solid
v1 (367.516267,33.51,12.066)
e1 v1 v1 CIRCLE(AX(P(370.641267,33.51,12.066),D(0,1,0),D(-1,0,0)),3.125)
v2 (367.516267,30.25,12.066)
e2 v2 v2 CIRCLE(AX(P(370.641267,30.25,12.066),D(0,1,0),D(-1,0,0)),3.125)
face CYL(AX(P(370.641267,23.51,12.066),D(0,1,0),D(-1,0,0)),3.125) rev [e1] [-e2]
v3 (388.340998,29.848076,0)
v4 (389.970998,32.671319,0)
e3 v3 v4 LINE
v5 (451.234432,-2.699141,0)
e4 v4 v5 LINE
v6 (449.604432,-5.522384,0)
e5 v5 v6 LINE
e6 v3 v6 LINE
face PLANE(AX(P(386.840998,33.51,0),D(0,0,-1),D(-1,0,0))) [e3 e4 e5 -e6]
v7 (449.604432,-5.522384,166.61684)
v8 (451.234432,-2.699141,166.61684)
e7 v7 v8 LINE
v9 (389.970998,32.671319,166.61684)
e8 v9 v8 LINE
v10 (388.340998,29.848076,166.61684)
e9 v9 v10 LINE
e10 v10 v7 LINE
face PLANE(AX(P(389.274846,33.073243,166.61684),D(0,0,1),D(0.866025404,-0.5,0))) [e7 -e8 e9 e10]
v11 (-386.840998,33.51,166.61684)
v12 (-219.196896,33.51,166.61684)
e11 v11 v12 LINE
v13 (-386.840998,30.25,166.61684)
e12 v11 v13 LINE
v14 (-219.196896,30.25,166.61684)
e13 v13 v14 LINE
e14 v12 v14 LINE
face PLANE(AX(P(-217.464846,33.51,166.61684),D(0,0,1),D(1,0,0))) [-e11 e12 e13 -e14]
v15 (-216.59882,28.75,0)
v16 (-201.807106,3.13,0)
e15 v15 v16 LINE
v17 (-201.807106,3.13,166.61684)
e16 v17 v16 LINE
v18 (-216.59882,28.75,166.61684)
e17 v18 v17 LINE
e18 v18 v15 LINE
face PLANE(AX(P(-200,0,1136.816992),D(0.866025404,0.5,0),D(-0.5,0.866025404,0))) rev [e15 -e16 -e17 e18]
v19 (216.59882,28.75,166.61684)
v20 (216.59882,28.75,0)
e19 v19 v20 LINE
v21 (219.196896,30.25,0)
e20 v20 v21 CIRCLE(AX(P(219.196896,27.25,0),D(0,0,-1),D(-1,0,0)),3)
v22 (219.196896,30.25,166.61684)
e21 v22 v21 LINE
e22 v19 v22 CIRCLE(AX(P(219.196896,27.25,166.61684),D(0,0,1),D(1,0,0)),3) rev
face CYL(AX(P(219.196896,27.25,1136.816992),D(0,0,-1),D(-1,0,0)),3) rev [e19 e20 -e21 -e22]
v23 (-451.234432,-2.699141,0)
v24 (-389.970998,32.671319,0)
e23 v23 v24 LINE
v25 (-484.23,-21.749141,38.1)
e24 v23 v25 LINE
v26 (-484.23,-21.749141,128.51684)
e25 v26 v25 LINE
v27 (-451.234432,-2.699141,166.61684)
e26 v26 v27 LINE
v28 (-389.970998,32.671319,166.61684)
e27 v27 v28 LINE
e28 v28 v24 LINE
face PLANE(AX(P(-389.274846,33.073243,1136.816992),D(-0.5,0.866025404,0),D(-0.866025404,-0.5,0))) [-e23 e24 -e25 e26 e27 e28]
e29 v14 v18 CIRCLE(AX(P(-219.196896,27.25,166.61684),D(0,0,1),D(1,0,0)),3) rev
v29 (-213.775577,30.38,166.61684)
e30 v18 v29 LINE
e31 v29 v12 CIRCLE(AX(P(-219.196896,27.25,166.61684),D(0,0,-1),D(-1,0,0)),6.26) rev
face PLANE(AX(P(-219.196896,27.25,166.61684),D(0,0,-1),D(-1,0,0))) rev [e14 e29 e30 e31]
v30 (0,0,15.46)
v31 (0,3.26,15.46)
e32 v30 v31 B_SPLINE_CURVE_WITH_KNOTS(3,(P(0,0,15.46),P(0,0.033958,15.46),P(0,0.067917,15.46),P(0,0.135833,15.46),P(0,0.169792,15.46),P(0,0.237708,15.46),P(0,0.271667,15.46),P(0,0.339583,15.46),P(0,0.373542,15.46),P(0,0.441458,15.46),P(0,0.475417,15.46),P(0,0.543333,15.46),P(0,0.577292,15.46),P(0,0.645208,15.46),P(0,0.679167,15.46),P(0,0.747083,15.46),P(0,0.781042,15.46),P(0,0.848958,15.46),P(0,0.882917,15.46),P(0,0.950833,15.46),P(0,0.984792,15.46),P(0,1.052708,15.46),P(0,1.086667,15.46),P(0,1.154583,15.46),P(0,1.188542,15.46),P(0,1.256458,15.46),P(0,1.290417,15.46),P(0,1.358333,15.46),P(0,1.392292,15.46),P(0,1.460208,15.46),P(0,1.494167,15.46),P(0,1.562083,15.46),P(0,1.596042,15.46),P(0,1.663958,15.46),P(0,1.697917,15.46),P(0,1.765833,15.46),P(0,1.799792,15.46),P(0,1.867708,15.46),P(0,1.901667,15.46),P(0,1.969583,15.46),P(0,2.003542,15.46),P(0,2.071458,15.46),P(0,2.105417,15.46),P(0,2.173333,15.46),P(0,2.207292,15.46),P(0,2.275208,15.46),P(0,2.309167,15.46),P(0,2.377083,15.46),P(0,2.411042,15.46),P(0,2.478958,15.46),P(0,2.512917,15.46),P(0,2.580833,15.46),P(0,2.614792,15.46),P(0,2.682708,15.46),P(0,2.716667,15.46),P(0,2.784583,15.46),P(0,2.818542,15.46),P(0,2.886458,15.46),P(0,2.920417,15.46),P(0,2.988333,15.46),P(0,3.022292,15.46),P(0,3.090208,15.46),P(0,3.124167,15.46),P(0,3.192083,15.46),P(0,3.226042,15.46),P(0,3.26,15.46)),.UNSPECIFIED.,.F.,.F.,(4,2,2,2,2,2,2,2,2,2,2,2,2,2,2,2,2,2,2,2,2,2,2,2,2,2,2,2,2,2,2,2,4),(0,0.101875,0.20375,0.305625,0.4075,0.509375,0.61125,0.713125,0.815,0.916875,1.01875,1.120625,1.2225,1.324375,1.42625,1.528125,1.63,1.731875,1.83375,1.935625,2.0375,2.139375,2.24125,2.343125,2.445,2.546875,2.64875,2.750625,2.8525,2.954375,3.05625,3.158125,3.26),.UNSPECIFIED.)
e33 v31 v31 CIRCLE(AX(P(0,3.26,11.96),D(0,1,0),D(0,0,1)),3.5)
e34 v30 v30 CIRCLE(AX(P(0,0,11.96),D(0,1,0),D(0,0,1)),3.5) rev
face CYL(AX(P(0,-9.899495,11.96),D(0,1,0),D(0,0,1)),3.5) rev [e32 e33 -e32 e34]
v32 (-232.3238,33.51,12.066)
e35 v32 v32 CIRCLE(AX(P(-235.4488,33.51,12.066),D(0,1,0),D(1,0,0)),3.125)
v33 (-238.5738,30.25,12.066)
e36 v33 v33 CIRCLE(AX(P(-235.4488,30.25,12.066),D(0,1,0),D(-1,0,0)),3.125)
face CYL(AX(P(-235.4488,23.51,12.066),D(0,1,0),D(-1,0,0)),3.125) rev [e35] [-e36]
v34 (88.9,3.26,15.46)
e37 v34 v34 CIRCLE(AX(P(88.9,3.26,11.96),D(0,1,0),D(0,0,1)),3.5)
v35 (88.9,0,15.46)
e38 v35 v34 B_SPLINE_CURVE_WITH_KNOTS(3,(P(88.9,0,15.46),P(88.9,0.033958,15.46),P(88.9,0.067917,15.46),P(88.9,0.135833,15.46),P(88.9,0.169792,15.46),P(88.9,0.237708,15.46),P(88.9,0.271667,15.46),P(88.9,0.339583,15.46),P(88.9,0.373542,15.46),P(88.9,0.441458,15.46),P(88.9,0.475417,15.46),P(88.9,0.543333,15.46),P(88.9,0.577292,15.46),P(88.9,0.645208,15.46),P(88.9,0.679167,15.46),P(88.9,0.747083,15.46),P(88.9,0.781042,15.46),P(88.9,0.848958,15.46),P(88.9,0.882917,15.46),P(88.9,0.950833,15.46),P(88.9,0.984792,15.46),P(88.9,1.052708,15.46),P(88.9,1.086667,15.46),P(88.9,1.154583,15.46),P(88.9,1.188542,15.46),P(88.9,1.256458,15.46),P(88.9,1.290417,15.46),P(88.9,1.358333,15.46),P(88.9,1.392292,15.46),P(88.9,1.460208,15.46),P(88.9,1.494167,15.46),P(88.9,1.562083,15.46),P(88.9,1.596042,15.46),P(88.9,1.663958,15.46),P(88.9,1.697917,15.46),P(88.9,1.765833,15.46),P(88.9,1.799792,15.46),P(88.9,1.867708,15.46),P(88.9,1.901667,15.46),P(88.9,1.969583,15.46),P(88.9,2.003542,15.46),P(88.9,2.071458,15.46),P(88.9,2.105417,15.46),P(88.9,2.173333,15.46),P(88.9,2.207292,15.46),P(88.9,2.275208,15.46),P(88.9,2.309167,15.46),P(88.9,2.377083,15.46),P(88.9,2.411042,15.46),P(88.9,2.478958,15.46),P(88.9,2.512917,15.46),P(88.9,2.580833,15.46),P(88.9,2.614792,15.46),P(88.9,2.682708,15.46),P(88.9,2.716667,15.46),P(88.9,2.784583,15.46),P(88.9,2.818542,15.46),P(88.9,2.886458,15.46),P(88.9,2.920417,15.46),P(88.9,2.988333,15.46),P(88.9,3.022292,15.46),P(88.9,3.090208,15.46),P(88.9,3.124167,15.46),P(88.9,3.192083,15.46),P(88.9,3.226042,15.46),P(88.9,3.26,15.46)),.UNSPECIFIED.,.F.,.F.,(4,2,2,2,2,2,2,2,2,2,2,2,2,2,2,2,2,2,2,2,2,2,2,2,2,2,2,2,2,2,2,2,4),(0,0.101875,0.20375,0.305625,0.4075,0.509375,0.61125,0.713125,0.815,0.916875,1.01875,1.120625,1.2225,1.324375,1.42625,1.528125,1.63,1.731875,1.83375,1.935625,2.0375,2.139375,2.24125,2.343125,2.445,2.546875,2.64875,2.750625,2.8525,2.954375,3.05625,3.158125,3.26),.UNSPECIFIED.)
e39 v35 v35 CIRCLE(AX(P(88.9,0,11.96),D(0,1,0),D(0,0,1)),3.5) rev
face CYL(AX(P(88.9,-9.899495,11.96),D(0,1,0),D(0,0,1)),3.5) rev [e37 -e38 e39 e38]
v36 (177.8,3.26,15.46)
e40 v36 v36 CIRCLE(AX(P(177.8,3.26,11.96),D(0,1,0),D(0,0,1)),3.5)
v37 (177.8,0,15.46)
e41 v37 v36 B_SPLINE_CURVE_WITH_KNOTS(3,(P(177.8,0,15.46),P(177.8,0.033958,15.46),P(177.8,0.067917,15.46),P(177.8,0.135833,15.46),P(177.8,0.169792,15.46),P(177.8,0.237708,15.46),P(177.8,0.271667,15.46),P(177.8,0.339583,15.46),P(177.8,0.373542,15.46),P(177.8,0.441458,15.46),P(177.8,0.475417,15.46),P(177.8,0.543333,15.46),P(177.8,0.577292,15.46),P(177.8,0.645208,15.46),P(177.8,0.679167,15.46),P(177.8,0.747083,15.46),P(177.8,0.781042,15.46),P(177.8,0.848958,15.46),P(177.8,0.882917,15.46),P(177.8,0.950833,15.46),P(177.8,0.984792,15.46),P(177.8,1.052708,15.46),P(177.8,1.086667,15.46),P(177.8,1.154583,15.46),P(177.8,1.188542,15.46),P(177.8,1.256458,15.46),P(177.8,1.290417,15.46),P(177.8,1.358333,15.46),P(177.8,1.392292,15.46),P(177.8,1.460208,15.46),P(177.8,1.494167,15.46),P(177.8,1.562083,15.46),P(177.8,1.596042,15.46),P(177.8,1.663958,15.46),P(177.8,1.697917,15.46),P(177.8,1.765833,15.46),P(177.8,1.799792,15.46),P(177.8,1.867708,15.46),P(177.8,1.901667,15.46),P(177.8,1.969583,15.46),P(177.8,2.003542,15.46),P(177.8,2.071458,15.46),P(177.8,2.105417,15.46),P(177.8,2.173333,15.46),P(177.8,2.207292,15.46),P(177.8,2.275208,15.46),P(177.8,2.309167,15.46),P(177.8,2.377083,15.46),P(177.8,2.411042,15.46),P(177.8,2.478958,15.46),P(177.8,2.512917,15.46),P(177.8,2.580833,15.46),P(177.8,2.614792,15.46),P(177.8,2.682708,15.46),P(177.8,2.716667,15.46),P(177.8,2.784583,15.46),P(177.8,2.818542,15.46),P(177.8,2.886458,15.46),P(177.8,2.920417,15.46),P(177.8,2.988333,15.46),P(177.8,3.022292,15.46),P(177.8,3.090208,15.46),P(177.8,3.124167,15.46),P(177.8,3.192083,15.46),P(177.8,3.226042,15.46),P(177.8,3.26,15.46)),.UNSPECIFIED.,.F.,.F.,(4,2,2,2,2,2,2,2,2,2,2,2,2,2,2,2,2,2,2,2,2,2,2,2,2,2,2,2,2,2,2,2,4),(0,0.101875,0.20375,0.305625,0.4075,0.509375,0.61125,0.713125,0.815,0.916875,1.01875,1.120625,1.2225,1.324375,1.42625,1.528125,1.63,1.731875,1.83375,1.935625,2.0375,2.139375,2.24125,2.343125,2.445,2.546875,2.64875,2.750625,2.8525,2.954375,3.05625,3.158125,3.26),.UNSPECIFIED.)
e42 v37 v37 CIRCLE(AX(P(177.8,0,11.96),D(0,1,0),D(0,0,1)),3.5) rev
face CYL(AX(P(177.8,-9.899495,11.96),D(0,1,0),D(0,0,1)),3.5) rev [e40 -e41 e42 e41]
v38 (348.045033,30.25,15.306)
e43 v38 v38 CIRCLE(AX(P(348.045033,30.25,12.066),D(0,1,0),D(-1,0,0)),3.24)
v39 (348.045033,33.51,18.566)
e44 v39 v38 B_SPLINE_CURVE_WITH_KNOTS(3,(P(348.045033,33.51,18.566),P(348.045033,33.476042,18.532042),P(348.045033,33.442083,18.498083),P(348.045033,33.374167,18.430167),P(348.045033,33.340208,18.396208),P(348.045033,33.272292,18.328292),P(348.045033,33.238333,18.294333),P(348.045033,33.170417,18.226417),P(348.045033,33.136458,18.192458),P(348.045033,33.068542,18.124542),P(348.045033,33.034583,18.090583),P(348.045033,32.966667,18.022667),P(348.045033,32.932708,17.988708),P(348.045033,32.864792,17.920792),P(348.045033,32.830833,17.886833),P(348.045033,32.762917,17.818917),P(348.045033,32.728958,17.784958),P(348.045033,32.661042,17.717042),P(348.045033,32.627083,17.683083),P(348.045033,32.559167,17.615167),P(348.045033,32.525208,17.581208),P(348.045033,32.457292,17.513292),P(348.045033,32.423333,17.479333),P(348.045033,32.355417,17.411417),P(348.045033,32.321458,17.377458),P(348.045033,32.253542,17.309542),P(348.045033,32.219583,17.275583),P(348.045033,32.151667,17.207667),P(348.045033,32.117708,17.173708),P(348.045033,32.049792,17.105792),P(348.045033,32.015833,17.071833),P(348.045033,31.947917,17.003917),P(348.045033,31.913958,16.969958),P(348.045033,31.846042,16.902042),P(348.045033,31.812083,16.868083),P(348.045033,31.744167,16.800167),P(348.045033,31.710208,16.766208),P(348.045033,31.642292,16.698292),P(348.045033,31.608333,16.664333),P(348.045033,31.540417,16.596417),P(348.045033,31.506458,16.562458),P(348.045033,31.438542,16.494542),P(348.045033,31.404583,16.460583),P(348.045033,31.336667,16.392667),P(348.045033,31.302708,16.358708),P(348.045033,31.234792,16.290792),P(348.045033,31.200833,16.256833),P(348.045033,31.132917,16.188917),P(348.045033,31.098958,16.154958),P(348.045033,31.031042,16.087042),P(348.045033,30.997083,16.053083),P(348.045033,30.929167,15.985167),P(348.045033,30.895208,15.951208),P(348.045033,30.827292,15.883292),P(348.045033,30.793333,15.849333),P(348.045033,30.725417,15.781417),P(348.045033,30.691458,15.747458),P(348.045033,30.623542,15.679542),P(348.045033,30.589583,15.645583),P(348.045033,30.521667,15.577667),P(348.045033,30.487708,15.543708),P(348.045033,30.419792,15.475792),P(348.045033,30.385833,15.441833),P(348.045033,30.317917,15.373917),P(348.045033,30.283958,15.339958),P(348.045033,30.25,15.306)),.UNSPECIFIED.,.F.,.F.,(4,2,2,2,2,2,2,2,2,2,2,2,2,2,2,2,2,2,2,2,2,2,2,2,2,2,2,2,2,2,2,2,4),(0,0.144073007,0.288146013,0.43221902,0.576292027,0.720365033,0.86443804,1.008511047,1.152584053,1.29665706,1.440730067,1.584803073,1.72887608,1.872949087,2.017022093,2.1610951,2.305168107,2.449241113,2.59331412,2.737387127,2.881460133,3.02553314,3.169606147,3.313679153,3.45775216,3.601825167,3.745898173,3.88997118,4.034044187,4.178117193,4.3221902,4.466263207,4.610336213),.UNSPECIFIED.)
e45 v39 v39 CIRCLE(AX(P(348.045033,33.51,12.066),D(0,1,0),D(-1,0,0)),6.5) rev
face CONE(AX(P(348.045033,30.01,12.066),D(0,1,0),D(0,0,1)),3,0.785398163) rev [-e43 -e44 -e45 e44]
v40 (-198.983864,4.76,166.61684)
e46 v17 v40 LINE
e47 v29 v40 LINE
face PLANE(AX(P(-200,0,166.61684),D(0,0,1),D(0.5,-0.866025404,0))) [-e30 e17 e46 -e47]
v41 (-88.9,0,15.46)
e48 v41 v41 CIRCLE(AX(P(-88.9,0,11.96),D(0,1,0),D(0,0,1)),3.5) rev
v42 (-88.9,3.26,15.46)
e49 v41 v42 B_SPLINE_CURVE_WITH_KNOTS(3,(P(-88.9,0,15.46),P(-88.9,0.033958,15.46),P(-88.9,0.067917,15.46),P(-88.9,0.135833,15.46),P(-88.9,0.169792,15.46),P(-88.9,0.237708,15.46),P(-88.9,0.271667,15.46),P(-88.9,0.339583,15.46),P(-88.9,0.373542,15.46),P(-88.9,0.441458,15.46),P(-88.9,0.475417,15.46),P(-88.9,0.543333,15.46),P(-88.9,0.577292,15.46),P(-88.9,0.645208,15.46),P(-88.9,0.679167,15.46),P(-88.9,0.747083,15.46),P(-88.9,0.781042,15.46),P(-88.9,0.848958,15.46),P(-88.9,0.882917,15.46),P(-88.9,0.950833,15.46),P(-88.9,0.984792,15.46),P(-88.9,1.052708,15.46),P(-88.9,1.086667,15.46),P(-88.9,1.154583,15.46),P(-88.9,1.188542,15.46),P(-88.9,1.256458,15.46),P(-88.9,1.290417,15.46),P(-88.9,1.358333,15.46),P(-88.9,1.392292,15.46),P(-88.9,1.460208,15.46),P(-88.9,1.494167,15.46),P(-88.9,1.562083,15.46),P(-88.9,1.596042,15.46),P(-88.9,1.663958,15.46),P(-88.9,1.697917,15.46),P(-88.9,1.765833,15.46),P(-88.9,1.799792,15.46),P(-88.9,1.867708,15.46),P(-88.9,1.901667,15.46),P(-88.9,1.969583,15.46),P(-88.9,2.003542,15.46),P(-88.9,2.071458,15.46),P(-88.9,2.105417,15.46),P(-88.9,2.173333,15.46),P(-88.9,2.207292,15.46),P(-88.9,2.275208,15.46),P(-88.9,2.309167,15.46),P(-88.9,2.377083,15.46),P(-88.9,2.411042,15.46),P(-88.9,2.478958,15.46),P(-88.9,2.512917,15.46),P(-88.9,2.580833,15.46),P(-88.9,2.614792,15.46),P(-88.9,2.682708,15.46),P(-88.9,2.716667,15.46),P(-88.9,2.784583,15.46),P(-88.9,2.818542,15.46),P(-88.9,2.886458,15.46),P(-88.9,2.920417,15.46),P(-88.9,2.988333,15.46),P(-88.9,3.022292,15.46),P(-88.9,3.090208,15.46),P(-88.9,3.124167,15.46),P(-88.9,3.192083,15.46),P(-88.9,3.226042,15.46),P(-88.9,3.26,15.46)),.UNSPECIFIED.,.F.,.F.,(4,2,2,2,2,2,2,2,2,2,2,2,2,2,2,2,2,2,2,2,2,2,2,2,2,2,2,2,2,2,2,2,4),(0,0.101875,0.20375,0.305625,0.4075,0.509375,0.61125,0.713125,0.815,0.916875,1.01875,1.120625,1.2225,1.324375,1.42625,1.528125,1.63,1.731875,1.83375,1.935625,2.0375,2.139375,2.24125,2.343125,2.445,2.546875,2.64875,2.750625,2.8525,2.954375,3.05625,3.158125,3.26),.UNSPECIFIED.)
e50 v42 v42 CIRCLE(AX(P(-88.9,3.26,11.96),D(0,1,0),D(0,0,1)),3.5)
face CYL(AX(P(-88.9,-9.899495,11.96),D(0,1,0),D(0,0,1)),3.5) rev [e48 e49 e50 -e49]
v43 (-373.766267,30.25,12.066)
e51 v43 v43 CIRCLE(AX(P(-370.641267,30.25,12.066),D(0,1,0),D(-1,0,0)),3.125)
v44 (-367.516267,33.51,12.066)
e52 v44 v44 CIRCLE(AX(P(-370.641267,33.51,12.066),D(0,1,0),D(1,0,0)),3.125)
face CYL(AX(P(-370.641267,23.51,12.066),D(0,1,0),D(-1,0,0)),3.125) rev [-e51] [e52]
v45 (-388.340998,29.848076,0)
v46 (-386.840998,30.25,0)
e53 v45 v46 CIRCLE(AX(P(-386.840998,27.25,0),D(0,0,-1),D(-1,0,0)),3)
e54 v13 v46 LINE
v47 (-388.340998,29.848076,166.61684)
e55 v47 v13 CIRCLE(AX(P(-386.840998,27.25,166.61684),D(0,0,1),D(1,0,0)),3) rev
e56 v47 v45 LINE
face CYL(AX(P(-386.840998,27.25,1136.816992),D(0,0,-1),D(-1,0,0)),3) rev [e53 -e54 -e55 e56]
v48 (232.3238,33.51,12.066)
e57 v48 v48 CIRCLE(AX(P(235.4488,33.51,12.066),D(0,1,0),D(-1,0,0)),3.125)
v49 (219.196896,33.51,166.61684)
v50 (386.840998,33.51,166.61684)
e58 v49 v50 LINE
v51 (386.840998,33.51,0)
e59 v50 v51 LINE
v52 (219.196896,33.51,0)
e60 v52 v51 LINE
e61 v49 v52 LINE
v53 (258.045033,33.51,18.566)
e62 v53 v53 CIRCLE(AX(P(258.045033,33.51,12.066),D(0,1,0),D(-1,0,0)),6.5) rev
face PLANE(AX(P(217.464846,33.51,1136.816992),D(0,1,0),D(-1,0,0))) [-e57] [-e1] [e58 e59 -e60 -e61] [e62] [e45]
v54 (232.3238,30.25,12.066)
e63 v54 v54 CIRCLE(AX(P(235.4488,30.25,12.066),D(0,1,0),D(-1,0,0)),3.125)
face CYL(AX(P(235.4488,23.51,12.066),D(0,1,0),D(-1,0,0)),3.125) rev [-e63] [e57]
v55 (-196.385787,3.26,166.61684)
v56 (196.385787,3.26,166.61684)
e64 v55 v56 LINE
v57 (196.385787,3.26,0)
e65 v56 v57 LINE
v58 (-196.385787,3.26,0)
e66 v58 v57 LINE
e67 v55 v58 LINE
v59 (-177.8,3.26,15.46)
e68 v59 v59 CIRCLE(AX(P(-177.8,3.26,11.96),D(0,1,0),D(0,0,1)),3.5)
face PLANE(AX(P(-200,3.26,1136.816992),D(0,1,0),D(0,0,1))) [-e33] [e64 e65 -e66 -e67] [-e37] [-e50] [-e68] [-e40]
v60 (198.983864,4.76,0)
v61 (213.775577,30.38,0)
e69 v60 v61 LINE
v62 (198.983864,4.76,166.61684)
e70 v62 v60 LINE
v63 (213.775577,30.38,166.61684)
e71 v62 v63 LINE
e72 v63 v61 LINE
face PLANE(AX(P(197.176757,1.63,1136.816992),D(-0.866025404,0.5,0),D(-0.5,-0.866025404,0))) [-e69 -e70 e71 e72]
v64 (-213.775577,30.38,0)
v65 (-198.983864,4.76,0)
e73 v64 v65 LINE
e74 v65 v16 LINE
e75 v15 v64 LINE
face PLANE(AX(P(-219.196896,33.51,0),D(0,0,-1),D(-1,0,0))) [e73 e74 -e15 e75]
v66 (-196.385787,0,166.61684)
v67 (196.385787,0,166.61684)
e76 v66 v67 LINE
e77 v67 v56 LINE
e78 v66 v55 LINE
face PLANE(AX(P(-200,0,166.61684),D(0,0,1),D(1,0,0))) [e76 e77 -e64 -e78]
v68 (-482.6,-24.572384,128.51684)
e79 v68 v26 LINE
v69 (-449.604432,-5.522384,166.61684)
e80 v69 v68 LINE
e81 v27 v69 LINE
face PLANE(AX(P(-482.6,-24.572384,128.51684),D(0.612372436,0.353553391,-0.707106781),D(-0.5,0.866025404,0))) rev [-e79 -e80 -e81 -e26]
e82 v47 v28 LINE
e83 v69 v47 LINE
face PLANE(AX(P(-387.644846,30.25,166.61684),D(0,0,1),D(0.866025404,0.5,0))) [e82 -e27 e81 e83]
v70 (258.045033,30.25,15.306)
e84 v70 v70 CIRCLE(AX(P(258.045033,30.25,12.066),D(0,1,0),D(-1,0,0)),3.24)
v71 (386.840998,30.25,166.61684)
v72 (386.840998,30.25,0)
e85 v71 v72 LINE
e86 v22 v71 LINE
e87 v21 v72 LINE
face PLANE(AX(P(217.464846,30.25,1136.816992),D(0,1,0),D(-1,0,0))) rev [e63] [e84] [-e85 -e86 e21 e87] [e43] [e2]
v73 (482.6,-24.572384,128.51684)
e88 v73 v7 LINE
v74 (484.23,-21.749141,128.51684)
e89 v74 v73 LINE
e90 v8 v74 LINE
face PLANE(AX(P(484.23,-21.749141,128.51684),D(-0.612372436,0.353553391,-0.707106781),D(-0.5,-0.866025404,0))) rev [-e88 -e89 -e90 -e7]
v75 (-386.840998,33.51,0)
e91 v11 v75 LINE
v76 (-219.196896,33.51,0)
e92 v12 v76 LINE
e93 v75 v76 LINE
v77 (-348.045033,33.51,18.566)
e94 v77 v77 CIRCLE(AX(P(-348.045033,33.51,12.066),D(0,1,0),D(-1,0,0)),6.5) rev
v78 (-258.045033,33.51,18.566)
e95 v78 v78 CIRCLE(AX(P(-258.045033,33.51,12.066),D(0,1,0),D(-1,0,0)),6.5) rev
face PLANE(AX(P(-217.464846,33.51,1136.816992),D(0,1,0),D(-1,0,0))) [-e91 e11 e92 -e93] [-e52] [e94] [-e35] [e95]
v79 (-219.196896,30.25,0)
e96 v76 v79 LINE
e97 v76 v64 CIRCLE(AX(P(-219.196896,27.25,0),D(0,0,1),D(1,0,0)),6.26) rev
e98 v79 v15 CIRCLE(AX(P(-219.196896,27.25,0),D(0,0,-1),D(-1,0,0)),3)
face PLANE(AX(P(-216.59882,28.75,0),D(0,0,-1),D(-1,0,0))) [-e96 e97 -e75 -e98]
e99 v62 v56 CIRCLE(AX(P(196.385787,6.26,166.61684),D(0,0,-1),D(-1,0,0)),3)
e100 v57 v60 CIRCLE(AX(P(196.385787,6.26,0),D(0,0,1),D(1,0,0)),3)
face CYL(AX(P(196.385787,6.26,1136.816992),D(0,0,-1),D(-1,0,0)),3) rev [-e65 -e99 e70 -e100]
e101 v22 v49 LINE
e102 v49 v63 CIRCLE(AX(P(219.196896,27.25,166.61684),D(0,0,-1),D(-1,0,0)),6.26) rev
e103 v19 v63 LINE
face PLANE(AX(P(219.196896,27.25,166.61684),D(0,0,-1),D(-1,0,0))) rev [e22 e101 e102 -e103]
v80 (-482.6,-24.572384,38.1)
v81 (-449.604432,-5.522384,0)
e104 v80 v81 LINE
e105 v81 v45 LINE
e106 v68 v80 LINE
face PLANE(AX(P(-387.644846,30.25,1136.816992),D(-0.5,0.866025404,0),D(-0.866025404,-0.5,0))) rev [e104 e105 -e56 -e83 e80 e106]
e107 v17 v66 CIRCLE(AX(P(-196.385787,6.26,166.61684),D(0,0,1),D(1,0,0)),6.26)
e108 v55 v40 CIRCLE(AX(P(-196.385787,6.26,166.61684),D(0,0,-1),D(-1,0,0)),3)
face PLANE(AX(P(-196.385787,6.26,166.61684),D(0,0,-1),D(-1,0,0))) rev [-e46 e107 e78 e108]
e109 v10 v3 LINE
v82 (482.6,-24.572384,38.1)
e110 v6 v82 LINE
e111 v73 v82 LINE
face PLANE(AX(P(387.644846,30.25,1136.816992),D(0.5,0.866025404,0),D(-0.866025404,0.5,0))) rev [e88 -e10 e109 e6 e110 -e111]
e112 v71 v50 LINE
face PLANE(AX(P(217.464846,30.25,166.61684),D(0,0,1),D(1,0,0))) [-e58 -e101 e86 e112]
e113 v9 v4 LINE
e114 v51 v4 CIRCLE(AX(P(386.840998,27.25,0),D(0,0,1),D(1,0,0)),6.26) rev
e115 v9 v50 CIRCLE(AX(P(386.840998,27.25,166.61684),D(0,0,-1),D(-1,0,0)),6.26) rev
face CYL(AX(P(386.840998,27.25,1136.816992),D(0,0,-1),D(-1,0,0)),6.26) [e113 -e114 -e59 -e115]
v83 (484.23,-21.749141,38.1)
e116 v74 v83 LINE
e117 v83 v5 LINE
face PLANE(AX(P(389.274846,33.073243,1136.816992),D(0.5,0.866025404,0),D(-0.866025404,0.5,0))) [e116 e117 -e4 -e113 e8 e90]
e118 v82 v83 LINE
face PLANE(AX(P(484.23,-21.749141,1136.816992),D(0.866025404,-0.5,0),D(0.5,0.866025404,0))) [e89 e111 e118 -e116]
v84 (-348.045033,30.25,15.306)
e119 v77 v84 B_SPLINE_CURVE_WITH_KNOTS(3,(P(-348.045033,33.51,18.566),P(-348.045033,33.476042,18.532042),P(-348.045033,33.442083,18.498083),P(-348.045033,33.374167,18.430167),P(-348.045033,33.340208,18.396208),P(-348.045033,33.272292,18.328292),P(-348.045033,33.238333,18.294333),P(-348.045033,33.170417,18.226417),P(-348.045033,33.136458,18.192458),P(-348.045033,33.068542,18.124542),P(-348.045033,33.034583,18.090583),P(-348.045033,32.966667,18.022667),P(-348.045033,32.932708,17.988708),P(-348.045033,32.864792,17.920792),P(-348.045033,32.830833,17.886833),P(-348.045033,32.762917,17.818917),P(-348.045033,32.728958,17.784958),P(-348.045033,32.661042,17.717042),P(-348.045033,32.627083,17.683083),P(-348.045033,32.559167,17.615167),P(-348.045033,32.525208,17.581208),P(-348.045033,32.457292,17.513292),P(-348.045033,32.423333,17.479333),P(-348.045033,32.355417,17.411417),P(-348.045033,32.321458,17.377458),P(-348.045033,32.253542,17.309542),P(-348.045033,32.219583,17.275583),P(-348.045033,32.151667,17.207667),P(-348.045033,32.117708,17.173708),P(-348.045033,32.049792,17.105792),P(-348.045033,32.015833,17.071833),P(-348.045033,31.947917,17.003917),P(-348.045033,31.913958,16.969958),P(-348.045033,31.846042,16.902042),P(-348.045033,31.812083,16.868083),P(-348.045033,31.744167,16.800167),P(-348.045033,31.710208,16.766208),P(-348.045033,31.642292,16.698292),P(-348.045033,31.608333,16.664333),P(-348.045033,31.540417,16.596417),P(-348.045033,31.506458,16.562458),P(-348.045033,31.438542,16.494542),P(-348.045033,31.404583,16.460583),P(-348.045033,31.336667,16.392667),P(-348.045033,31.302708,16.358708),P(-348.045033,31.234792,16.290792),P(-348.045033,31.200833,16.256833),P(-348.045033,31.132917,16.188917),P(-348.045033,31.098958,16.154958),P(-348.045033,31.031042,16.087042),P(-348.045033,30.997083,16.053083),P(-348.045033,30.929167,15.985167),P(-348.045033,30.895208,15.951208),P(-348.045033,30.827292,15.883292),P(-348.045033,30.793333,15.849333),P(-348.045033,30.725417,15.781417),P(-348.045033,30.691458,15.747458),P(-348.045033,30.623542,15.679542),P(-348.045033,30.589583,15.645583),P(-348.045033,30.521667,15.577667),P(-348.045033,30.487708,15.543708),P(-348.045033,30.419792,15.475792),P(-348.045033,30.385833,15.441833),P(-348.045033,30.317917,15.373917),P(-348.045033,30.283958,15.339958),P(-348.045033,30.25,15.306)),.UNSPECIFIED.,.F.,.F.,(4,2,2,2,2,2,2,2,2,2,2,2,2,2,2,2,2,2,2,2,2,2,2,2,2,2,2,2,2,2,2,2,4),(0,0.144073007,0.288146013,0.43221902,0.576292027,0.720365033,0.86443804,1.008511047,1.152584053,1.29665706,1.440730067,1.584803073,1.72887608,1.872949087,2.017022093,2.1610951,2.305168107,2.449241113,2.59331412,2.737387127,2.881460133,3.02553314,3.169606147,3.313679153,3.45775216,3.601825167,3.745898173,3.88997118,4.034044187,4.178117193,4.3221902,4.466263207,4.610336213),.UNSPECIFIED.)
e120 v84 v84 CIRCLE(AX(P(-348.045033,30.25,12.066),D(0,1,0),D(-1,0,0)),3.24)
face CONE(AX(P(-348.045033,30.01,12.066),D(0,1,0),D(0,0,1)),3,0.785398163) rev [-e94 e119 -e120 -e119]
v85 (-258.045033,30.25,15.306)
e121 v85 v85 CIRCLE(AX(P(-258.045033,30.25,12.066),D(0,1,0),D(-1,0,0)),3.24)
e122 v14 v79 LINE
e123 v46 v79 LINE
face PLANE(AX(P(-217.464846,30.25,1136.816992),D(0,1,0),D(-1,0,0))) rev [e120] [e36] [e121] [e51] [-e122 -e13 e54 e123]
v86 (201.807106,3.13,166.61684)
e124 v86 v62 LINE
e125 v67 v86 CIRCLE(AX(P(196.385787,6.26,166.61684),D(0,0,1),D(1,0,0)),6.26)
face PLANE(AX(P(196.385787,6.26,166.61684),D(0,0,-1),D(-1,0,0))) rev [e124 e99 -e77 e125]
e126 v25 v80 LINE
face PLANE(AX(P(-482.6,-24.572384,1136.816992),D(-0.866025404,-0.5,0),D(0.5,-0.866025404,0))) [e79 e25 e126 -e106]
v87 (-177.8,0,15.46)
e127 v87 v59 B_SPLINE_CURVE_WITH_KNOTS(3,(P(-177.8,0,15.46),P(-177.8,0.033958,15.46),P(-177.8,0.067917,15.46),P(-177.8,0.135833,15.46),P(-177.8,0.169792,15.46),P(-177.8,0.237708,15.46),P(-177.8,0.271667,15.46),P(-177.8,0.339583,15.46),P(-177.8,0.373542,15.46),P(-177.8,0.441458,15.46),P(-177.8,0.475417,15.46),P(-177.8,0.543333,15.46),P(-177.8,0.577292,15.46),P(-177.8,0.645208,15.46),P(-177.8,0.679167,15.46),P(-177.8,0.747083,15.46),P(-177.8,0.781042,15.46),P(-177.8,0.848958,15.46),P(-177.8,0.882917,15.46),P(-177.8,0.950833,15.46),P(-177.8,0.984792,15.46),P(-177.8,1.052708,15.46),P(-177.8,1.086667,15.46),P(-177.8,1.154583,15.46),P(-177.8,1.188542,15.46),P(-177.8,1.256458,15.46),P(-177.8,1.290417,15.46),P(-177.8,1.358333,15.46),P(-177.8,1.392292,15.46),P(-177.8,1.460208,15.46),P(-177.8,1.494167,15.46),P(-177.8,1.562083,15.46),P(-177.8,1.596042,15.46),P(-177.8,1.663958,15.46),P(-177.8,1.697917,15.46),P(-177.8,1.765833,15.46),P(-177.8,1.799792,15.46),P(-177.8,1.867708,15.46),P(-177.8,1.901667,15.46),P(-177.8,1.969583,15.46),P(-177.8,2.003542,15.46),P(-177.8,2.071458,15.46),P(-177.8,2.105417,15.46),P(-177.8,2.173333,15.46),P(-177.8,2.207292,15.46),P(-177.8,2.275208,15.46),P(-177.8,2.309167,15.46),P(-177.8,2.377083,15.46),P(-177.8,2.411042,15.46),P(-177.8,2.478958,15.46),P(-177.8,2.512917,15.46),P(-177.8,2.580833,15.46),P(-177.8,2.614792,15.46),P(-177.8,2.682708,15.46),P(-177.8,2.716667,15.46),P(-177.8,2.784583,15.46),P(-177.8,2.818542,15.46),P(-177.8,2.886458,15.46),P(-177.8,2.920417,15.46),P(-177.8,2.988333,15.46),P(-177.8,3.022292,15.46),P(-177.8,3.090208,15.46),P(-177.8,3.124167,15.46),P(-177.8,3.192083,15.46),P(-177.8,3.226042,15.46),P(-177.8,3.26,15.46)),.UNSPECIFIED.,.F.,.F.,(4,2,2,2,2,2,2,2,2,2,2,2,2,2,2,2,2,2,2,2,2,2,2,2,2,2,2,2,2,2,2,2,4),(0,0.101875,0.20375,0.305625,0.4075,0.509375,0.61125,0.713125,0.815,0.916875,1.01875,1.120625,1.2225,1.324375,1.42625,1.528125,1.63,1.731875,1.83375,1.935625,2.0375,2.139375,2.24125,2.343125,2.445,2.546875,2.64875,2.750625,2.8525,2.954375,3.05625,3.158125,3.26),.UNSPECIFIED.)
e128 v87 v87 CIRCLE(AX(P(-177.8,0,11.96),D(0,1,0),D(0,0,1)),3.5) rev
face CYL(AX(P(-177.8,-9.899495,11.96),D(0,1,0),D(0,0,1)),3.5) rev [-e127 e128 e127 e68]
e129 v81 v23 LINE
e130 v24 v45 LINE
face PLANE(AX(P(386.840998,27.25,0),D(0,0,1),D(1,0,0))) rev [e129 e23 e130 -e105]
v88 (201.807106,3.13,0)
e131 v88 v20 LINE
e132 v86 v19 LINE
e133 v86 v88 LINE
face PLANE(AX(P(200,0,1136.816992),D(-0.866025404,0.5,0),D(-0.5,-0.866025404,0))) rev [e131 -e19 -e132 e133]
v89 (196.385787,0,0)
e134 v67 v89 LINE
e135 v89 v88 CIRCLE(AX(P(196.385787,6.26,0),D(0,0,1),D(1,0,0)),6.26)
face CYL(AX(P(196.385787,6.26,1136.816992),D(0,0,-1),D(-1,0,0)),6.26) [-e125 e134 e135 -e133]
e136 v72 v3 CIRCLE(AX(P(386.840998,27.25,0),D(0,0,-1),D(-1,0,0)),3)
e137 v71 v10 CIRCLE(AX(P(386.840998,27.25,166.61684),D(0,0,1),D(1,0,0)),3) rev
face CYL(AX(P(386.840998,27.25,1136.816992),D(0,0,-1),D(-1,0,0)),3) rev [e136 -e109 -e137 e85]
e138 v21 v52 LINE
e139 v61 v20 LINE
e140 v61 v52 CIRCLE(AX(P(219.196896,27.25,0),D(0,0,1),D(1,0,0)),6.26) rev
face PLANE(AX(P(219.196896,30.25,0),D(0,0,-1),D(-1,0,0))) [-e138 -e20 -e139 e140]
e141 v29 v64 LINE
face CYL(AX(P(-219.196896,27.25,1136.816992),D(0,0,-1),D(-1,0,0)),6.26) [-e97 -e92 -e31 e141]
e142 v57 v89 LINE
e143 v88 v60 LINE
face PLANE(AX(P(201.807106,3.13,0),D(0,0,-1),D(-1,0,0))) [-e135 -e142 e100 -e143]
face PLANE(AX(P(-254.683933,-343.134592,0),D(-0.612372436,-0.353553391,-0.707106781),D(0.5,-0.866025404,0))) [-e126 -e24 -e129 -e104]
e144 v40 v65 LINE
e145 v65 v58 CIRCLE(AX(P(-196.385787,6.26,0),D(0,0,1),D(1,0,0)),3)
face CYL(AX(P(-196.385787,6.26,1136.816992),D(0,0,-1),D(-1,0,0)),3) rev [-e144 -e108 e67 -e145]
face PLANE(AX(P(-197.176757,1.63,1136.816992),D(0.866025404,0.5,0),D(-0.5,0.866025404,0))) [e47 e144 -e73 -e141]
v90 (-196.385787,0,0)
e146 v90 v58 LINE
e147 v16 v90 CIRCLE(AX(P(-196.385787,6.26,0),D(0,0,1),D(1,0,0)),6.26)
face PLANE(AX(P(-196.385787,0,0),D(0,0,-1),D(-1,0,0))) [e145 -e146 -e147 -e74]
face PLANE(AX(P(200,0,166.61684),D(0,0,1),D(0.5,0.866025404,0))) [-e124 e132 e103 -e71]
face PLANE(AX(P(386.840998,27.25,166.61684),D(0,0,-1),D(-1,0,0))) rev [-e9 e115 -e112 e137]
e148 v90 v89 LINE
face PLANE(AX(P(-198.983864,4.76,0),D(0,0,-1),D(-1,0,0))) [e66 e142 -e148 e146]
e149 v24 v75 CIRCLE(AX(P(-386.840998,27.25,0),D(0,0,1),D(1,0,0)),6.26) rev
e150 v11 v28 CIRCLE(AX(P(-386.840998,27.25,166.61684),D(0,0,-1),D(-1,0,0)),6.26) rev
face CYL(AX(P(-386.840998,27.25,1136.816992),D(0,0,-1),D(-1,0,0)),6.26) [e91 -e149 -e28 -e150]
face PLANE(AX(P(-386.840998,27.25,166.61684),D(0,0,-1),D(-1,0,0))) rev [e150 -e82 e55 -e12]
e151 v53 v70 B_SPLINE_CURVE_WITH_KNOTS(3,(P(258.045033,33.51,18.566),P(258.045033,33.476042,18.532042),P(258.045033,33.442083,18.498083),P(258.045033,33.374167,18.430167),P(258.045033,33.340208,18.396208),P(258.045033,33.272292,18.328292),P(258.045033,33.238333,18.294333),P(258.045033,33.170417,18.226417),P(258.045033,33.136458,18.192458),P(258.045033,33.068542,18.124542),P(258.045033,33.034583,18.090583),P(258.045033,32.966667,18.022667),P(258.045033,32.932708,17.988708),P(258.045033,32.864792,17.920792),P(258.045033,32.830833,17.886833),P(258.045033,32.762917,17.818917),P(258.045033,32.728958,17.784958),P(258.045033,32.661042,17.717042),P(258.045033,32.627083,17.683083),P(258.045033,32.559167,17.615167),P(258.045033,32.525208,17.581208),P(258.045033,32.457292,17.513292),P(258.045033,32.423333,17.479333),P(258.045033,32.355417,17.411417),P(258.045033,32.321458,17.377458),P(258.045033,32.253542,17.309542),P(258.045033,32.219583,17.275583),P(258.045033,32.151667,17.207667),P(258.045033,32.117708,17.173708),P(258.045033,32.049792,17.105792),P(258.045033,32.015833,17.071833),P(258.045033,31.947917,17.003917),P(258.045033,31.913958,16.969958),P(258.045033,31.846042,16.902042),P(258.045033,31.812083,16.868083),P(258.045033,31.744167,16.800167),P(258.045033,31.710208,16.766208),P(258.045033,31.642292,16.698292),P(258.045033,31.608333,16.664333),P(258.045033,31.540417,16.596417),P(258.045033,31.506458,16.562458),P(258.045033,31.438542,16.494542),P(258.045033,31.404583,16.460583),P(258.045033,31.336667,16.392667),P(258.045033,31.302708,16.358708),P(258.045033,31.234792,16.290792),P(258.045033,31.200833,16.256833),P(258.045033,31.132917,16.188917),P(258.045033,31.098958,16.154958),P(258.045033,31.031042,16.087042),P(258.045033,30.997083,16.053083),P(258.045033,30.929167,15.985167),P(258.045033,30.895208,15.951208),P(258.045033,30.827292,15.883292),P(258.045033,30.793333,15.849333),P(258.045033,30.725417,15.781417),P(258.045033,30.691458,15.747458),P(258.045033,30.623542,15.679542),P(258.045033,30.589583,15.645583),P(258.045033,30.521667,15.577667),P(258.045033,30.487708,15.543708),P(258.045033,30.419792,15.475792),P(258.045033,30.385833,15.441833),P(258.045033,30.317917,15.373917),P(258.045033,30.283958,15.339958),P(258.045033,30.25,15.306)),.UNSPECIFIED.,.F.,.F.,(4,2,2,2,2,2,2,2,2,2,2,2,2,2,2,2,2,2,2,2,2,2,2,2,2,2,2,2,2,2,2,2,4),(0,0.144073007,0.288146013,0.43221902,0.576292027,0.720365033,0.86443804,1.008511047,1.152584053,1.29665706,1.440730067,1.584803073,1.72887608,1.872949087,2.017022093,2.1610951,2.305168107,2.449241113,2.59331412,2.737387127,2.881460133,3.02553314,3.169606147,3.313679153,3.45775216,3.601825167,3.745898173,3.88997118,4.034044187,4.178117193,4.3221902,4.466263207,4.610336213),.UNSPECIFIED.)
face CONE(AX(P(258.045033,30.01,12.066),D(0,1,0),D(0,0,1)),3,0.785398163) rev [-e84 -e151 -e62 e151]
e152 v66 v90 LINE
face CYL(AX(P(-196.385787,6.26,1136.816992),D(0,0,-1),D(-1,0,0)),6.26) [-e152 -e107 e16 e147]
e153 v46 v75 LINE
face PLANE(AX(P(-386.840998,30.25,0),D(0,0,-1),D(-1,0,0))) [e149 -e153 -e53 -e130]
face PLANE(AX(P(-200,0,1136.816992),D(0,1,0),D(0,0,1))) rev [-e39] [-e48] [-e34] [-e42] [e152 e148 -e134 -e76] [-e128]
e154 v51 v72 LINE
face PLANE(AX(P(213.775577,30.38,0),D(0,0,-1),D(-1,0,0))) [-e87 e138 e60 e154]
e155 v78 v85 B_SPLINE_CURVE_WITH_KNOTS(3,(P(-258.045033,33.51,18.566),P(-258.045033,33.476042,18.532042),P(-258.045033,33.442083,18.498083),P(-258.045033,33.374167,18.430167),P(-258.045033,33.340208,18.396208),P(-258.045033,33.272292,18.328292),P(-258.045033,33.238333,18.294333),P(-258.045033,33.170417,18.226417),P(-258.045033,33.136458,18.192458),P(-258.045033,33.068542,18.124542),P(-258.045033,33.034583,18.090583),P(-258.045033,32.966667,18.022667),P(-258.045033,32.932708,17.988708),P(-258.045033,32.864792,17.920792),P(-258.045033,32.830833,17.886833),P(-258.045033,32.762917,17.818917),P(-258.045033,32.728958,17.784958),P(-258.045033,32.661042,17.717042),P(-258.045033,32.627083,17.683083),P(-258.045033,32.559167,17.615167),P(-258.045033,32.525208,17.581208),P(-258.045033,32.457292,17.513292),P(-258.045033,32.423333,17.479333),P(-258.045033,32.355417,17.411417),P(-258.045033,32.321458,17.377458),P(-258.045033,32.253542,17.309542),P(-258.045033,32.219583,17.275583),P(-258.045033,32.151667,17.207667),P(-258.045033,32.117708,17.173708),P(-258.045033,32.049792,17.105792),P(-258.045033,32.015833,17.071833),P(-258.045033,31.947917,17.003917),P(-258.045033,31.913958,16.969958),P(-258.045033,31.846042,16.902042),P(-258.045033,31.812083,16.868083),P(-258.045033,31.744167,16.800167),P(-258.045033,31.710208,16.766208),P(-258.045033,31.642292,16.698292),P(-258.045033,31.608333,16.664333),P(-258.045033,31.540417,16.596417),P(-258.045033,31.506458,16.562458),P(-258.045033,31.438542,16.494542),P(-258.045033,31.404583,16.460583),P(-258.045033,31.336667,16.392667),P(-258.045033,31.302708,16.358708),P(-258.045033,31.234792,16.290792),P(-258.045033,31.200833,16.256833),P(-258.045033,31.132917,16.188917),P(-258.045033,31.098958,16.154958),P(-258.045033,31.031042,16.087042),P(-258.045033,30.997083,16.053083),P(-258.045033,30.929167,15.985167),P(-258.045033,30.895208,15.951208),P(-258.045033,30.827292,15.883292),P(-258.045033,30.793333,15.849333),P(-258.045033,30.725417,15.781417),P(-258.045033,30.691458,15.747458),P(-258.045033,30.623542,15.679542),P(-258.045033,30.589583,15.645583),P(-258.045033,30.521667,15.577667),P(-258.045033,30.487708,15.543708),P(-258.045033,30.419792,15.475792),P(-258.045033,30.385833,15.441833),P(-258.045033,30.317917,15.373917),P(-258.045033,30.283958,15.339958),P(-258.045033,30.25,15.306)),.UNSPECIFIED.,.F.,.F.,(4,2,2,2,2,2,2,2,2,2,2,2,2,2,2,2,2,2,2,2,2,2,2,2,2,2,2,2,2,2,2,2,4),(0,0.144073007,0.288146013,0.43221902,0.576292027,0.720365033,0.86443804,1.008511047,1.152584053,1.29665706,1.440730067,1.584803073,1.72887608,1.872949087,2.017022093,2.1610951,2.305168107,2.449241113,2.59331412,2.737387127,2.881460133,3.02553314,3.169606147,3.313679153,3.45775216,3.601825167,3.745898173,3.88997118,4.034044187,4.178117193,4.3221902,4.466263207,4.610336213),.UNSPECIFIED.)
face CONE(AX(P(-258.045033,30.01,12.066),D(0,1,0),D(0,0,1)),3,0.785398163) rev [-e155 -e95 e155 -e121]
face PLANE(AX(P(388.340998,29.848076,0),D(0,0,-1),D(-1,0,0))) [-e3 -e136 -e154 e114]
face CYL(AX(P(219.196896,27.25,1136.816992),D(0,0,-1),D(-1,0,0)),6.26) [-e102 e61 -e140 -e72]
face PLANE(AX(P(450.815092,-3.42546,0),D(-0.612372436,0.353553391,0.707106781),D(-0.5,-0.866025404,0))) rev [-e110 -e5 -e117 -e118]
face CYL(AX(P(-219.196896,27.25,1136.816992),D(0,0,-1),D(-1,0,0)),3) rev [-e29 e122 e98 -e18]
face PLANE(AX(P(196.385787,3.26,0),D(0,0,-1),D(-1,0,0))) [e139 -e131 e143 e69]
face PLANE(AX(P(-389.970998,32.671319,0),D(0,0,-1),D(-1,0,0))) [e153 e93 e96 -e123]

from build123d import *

# Parameters (mm, degrees)
BASE_FLANGE1_DEPTH = 166.61684
SKETCH2_R          = 3.5
CUT_EXTRUDE1_DEPTH = 3.26
CHAMFER1_SIZE      = 38.1
SKETCH3_R          = 3
CUT_EXTRUDE2_DEPTH = 3.26
SKETCH8_R          = 3.125
CUT_EXTRUDE7_DEPTH = 10
CHAMFER2_SIZE      = 3.5


# Sheet-metal steps are written as plain solids
with BuildPart() as part:
    # Sketch1 → Base-Flange1 (new body)
    with BuildSketch(Plane.XY):
        with BuildLine():
            Line((-482.6, -24.572383929), (-388.340998066, 29.848076211))
            ThreePointArc((-388.340998066, 29.848076211), (-387.617455201, 30.147777479), (-386.840998066, 30.25))
            Line((-386.840998066, 30.25), (-219.196896451, 30.25))
            ThreePointArc((-219.196896451, 30.25), (-217.696896451, 29.848076211), (-216.598820239, 28.75))
            Line((-216.598820239, 28.75), (-201.807106343, 3.13))
            ThreePointArc((-201.807106343, 3.13), (-199.515787315, 0.838680972), (-196.385787315, 0))
            Line((-196.385787315, 0), (196.385787315, 0))
            ThreePointArc((196.385787315, 0), (199.515787315, 0.838680972), (201.807106343, 3.13))
            Line((201.807106343, 3.13), (216.598820239, 28.75))
            ThreePointArc((216.598820239, 28.75), (217.696896451, 29.848076211), (219.196896451, 30.25))
            Line((219.196896451, 30.25), (386.840998066, 30.25))
            ThreePointArc((386.840998066, 30.25), (387.617455201, 30.147777479), (388.340998066, 29.848076211))
            Line((388.340998066, 29.848076211), (482.6, -24.572383929))
            Line((482.6, -24.572383929), (484.23, -21.749141113))
            Line((484.23, -21.749141113), (389.970998066, 32.671319028))
            ThreePointArc((389.970998066, 32.671319028), (388.461205288, 33.296695673), (386.840998066, 33.51))
            Line((386.840998066, 33.51), (219.196896451, 33.51))
            ThreePointArc((219.196896451, 33.51), (216.066896451, 32.671319028), (213.775577423, 30.38))
            Line((213.775577423, 30.38), (198.983863526, 4.76))
            ThreePointArc((198.983863526, 4.76), (197.885787315, 3.661923789), (196.385787315, 3.26))
            Line((196.385787315, 3.26), (-196.385787315, 3.26))
            ThreePointArc((-196.385787315, 3.26), (-197.885787315, 3.661923789), (-198.983863526, 4.76))
            Line((-198.983863526, 4.76), (-213.775577423, 30.38))
            ThreePointArc((-213.775577423, 30.38), (-216.066896451, 32.671319028), (-219.196896451, 33.51))
            Line((-219.196896451, 33.51), (-386.840998066, 33.51))
            ThreePointArc((-386.840998066, 33.51), (-388.461205288, 33.296695673), (-389.970998066, 32.671319028))
            Line((-389.970998066, 32.671319028), (-484.23, -21.749141113))
            Line((-484.23, -21.749141113), (-482.6, -24.572383929))
        make_face()
    extrude(amount=BASE_FLANGE1_DEPTH)

    # Sketch2 → Cut-Extrude1 (cut)
    with BuildSketch(Plane(origin=(0, 3.26, 0), x_dir=(1, 0, 0), z_dir=(0, 1, 0))):
        with Locations(Location((0, -11.96, 0), (0, 0, 270))):
            Circle(SKETCH2_R)
        with Locations(Location((-177.8, -11.96, 0), (0, 0, 270))):
            Circle(SKETCH2_R)
        with Locations(Location((-88.9, -11.96, 0), (0, 0, 270))):
            Circle(SKETCH2_R)
        with Locations(Location((88.9, -11.96, 0), (0, 0, 270))):
            Circle(SKETCH2_R)
        with Locations(Location((177.8, -11.96, 0), (0, 0, 270))):
            Circle(SKETCH2_R)
    extrude(amount=-CUT_EXTRUDE1_DEPTH, mode=Mode.SUBTRACT)

    # Chamfer1
    chamfer1_edges = [part.edges().sort_by_distance(p)[0] for p in [
        (-483.415, -23.160762521, 166.61684),
        (-483.415, -23.160762521, 0),
        (483.415, -23.160762521, 0),
        (483.415, -23.160762521, 166.61684),
    ]]
    chamfer(chamfer1_edges, length=CHAMFER1_SIZE)

    # Sketch3 → Cut-Extrude2 (cut)
    with BuildSketch(Plane(origin=(0, 33.51, 0), x_dir=(1, 0, 0), z_dir=(0, 1, 0))):
        with Locations(Location((-258.045033443, -12.066000028, 0), (0, 0, 180))):
            Circle(SKETCH3_R)
        with Locations(Location((-348.045033443, -12.066000028, 0), (0, 0, 180))):
            Circle(SKETCH3_R)
        with Locations(Location((258.045033443, -12.066000028, 0), (0, 0, 180))):
            Circle(SKETCH3_R)
        with Locations(Location((348.045033443, -12.066000028, 0), (0, 0, 180))):
            Circle(SKETCH3_R)
    extrude(amount=-CUT_EXTRUDE2_DEPTH, mode=Mode.SUBTRACT)

    # Sketch8 → Cut-Extrude7 (cut)
    with BuildSketch(Plane(origin=(0, 33.51, 0), x_dir=(1, 0, 0), z_dir=(0, 1, 0))):
        with Locations(Location((235.448800169, -12.066000028, 0), (0, 0, 180))):
            Circle(SKETCH8_R)
        with Locations(Location((370.641266718, -12.066000028, 0), (0, 0, 180))):
            Circle(SKETCH8_R)
        with Locations(Location((-370.641266718, -12.066000028, 0), (0, 0, 180))):
            Circle(SKETCH8_R)
        with Locations(Location((-235.448800169, -12.066000028, 0), (0, 0, 180))):
            Circle(SKETCH8_R)
    extrude(amount=-CUT_EXTRUDE7_DEPTH, mode=Mode.SUBTRACT)

    # Chamfer2
    # the kernel refuses this chamfer: 3.5 mm, written as the material it takes off along each edge
    with BuildSketch(Plane(origin=(-348.045033443, 33.51, 12.066000028), x_dir=(-1, 0, 0), z_dir=(0, 0, -1))) as chamfer2_piece_1:
        Polygon((3 + CHAMFER2_SIZE, 0), (3, -CHAMFER2_SIZE), (3, 0), align=None)
    revolve(axis=Axis((-348.045033443, 33.51, 12.066000028), (0, 1, 0)), mode=Mode.SUBTRACT)
    with BuildSketch(Plane(origin=(-258.045033443, 33.51, 12.066000028), x_dir=(-1, 0, 0), z_dir=(0, 0, -1))) as chamfer2_piece_2:
        Polygon((3 + CHAMFER2_SIZE, 0), (3, -CHAMFER2_SIZE), (3, 0), align=None)
    revolve(axis=Axis((-258.045033443, 33.51, 12.066000028), (0, 1, 0)), mode=Mode.SUBTRACT)
    with BuildSketch(Plane(origin=(348.045033443, 33.51, 12.066000028), x_dir=(-1, 0, 0), z_dir=(0, 0, -1))) as chamfer2_piece_3:
        Polygon((3 + CHAMFER2_SIZE, 0), (3, -CHAMFER2_SIZE), (3, 0), align=None)
    revolve(axis=Axis((348.045033443, 33.51, 12.066000028), (0, 1, 0)), mode=Mode.SUBTRACT)
    with BuildSketch(Plane(origin=(258.045033443, 33.51, 12.066000028), x_dir=(-1, 0, 0), z_dir=(0, 0, -1))) as chamfer2_piece_4:
        Polygon((3 + CHAMFER2_SIZE, 0), (3, -CHAMFER2_SIZE), (3, 0), align=None)
    revolve(axis=Axis((258.045033443, 33.51, 12.066000028), (0, 1, 0)), mode=Mode.SUBTRACT)


solid = part.part
